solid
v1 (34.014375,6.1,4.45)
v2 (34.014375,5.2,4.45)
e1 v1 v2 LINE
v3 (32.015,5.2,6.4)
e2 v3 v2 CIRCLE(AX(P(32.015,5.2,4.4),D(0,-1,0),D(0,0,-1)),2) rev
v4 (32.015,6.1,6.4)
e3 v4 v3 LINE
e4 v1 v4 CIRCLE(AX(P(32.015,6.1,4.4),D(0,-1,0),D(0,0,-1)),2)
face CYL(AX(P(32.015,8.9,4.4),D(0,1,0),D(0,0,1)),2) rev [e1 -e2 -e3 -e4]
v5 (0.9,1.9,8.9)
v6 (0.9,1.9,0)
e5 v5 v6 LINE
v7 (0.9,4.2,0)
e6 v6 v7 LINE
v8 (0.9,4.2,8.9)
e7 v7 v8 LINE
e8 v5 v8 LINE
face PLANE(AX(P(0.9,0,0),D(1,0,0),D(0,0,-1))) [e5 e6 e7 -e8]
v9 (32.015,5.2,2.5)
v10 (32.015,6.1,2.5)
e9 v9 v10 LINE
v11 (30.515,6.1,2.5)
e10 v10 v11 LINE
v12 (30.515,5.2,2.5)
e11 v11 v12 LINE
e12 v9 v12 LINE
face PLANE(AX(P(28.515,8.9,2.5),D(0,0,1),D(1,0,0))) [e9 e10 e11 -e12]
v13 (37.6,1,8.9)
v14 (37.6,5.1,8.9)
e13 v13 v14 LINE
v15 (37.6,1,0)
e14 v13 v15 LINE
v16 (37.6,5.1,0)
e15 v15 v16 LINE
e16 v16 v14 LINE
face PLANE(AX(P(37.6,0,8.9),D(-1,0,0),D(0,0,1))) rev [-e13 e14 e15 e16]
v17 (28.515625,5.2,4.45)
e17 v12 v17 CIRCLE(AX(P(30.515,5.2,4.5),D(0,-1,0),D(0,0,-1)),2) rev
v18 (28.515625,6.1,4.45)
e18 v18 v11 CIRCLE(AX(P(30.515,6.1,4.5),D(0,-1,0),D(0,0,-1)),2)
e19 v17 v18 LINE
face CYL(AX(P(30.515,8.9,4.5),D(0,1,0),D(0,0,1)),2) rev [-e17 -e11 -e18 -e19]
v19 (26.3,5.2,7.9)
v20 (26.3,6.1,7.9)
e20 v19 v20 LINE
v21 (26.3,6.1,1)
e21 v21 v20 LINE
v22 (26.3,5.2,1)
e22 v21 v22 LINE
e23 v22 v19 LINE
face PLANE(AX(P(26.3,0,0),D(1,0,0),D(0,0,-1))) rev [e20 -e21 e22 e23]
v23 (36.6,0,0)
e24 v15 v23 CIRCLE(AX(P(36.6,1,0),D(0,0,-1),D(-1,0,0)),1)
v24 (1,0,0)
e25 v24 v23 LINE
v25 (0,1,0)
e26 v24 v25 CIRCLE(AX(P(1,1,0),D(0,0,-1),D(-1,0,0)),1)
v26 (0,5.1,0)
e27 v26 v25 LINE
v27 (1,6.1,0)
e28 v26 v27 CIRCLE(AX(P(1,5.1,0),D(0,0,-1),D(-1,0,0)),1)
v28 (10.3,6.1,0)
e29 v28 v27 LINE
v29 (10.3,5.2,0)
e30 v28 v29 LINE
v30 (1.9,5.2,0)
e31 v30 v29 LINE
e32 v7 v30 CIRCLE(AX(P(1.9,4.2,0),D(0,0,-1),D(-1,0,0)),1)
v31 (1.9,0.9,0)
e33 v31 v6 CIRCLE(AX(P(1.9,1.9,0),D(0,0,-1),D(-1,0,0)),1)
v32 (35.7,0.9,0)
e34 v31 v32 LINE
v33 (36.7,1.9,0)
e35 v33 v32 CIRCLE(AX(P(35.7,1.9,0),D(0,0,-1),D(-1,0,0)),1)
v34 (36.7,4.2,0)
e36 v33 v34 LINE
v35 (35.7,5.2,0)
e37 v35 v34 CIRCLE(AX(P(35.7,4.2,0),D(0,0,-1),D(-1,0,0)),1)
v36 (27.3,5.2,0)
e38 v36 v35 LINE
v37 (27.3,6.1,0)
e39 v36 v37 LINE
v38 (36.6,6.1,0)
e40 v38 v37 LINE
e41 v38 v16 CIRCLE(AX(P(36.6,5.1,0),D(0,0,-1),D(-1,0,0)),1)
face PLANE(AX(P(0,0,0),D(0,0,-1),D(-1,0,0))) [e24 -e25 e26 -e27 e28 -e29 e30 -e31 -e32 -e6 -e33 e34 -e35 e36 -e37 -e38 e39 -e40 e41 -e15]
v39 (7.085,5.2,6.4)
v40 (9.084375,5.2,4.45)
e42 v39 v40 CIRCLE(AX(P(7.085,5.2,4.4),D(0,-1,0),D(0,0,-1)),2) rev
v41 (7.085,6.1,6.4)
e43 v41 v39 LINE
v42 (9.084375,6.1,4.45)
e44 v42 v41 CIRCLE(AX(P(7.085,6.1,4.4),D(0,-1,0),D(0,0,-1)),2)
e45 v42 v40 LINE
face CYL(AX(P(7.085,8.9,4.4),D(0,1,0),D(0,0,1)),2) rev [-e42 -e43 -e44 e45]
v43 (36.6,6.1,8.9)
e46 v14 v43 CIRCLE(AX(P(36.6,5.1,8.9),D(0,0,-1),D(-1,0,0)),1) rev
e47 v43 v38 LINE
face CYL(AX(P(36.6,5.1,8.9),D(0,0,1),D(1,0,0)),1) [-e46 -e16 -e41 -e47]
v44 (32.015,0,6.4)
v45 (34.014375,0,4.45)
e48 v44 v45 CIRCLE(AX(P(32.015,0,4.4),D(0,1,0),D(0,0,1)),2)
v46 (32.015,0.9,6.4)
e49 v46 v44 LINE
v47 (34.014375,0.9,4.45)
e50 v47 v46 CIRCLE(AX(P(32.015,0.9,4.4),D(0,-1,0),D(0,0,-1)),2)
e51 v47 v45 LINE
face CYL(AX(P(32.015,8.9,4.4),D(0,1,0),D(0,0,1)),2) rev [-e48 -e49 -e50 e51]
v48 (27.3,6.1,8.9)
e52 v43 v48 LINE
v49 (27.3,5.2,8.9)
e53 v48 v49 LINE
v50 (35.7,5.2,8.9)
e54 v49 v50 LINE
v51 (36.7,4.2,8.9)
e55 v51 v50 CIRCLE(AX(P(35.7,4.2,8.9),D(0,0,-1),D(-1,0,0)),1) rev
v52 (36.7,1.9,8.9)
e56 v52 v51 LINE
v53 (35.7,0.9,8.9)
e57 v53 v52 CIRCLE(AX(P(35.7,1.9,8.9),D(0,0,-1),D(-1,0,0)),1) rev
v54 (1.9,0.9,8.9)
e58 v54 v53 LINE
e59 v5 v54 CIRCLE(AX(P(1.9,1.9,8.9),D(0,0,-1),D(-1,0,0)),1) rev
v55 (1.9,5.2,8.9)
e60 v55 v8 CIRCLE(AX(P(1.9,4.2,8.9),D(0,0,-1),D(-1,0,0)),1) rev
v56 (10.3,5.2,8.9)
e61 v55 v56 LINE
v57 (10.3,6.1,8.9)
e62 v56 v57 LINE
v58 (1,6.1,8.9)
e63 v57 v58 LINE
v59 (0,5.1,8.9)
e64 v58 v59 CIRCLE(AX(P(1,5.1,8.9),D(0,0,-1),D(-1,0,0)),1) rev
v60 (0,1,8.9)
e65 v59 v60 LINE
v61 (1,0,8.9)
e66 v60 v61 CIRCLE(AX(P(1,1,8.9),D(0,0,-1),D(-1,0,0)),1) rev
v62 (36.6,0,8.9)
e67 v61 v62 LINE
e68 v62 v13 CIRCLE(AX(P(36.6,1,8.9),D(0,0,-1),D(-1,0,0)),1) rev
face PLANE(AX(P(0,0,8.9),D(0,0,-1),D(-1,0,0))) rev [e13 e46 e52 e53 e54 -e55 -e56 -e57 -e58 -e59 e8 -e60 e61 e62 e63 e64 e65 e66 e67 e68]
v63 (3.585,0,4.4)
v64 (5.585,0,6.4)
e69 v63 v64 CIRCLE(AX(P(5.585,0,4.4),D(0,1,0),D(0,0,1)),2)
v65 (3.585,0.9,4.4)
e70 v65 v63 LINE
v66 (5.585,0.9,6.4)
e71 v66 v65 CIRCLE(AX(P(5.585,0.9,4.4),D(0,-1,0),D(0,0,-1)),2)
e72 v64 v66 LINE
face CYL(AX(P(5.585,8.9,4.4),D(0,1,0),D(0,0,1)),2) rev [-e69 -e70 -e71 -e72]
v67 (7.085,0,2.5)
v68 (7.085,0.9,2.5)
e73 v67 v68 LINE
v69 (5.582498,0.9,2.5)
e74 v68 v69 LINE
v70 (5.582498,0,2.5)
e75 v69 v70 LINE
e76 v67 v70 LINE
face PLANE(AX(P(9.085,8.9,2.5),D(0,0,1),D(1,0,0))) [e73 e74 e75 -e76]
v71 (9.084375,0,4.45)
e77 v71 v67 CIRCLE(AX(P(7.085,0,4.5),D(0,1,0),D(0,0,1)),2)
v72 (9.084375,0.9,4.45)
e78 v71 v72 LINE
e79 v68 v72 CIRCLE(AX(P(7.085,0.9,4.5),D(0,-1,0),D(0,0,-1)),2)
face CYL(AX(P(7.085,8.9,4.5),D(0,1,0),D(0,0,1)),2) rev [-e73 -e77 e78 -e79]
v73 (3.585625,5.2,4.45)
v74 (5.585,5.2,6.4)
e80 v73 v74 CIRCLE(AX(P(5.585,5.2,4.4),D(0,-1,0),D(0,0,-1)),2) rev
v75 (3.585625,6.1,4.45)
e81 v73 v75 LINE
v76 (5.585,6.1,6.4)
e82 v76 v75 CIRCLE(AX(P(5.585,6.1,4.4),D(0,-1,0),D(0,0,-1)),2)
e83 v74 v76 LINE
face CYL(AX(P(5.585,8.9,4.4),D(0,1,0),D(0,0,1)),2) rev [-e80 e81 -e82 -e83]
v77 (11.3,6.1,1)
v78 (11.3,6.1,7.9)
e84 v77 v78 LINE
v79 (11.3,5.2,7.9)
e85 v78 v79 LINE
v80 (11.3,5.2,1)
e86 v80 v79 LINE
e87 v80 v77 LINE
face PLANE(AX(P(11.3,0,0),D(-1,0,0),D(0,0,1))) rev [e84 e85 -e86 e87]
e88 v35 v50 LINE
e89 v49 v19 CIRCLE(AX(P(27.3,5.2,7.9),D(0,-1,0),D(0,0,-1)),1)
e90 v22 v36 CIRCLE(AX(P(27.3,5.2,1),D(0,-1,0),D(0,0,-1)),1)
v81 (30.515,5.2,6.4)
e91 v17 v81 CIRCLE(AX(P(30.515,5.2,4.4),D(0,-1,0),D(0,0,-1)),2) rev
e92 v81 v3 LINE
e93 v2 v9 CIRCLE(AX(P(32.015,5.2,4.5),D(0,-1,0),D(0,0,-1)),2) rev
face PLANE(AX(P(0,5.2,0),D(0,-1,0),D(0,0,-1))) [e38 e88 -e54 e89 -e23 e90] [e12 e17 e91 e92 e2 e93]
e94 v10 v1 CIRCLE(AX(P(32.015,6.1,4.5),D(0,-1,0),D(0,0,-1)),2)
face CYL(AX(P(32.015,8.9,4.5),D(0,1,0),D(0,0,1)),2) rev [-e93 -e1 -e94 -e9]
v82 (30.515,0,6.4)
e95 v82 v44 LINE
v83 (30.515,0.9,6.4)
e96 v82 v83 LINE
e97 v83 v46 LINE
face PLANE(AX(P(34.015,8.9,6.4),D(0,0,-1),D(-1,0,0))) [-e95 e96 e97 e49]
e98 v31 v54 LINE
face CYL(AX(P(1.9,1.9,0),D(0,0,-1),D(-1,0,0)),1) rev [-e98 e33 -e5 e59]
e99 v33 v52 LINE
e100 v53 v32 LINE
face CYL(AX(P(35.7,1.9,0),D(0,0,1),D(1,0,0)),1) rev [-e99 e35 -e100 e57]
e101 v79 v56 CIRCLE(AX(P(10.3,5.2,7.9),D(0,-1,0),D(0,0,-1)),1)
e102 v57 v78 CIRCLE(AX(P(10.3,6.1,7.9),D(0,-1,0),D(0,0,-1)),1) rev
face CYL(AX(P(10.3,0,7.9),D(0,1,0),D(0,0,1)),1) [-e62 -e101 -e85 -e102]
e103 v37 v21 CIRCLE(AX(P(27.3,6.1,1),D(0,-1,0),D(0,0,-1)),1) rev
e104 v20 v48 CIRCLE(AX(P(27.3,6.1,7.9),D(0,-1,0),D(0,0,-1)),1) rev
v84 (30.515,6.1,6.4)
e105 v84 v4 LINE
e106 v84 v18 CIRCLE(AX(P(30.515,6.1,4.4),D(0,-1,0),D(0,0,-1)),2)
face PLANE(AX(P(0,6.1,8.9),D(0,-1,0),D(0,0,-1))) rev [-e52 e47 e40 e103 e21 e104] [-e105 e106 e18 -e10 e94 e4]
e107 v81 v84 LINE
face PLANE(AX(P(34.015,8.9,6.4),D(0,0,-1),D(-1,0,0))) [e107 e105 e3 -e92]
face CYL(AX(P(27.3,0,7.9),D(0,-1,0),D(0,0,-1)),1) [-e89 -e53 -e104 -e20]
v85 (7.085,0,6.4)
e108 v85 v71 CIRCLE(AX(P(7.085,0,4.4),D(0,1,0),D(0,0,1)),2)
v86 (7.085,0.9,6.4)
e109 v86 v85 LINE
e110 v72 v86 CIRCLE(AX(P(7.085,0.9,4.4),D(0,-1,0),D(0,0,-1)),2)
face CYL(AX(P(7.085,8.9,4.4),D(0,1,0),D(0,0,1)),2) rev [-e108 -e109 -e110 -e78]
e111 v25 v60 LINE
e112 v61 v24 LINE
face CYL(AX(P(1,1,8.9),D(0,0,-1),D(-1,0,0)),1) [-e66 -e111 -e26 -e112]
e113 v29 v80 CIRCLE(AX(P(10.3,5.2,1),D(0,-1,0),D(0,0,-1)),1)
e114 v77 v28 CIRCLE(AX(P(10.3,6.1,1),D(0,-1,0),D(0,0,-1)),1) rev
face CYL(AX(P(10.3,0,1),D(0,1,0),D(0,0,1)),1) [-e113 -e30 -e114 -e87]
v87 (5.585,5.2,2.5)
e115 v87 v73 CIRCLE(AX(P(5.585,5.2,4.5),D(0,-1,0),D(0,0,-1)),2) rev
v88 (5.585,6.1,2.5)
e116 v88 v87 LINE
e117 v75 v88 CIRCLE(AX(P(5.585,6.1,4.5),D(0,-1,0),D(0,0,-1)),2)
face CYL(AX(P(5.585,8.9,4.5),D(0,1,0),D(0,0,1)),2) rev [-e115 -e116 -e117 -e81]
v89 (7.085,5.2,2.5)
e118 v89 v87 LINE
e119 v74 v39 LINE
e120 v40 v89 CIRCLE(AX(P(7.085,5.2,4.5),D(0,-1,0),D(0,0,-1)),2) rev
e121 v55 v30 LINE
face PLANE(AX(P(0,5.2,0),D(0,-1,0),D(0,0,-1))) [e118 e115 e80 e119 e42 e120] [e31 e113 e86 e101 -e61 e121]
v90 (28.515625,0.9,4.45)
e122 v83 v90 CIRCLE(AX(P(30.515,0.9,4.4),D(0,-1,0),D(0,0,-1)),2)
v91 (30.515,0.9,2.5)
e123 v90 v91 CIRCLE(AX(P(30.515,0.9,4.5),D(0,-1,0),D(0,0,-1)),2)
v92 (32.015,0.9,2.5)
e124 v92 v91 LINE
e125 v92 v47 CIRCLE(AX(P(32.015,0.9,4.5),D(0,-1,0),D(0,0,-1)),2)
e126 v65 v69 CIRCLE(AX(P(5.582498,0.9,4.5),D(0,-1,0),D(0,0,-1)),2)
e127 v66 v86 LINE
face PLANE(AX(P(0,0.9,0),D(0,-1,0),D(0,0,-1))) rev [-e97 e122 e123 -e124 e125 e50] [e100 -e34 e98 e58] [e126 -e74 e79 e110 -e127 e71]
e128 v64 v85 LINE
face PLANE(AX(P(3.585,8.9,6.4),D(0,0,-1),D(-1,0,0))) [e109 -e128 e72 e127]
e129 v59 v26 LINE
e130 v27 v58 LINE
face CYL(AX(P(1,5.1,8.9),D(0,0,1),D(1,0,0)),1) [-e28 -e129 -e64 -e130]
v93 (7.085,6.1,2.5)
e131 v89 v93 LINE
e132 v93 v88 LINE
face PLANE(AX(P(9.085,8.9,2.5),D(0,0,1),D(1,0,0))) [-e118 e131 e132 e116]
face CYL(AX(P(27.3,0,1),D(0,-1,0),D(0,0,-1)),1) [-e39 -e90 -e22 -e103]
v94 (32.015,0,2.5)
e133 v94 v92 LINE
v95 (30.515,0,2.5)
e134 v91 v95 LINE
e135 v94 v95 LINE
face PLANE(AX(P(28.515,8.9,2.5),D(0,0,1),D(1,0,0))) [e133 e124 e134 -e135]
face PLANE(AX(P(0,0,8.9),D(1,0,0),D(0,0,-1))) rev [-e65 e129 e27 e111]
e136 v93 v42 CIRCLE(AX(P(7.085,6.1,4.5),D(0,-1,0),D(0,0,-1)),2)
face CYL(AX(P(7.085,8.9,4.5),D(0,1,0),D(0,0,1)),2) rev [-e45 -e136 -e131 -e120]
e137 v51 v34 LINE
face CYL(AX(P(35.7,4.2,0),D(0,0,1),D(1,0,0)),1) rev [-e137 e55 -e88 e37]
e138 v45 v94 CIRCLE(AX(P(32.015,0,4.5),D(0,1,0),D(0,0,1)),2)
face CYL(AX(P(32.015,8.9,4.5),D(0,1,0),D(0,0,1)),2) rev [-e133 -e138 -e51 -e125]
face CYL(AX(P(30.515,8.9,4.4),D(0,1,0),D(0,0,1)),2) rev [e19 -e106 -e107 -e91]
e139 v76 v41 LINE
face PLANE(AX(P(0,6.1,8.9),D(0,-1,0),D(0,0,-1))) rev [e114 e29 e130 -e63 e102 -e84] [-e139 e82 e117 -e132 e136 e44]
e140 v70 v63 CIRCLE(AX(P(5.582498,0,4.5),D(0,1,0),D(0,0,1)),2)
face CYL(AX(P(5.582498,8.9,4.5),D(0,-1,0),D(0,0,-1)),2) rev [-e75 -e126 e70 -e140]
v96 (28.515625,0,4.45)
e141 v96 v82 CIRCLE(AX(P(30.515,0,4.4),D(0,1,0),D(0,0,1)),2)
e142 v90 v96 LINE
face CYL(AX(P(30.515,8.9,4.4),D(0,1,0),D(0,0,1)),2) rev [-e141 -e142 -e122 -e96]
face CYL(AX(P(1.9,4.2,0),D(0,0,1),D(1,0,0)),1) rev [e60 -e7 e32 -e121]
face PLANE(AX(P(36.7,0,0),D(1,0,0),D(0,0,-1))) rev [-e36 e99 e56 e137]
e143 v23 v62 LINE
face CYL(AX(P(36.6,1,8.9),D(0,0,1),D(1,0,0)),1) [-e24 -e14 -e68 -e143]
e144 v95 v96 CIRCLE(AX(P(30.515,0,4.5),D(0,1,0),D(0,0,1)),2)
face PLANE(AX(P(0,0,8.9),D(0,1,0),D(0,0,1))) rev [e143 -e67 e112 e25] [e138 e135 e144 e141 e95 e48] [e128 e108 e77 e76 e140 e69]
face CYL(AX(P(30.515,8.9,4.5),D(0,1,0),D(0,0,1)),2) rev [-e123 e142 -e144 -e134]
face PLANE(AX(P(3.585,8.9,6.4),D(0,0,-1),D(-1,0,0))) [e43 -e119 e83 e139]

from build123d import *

# Parameters (mm, degrees)
CROQUIS1_W              = 37.6
CROQUIS1_H              = 6.1
SALIENTE_EXTRUIR1_DEPTH = 8.9
CROQUIS2_W              = 35.8
CROQUIS2_H              = 4.3
CROQUIS2_W_2            = 15
CROQUIS2_H_2            = 0.9
CORTAR_EXTRUIR2_DEPTH   = 8.9
CROQUIS3_W              = 5.5
CROQUIS3_H              = 3.9
CORTAR_EXTRUIR3_DEPTH   = 8.9
REDONDEO1_R             = 2
REDONDEO2_START         = 5.2
REDONDEO2_DEPTH         = 0.9
REDONDEO2_2_DEPTH       = 0.9
REDONDEO4_R             = 1
REDONDEO5_R             = 1
REDONDEO6_R             = 1
REDONDEO7_R             = 1
REDONDEO8_R             = 1
REDONDEO9_R             = 1
REDONDEO10_R            = 1
REDONDEO11_R            = 1
REDONDEO12_R            = 1
REDONDEO13_R            = 1
REDONDEO14_R            = 1
REDONDEO15_R            = 1


with BuildPart() as part:
    # Croquis1 → Saliente-Extruir1 (new body)
    with BuildSketch(Plane.XY):
        with Locations((18.8, 3.05)):
            Rectangle(CROQUIS1_W, CROQUIS1_H)
    extrude(amount=SALIENTE_EXTRUIR1_DEPTH)

    # Croquis2 → Cortar-Extruir2 (cut)
    with BuildSketch(Plane.XY.offset(8.9)):
        with Locations((18.8, 3.05)):
            Rectangle(CROQUIS2_W, CROQUIS2_H)
        with Locations((18.8, 5.65)):
            Rectangle(CROQUIS2_W_2, CROQUIS2_H_2)
    extrude(amount=-CORTAR_EXTRUIR2_DEPTH, mode=Mode.SUBTRACT)

    # Croquis3 → Cortar-Extruir3 (cut)
    with BuildSketch(Plane(origin=(0, 0, 0), x_dir=(1, 0, 0), z_dir=(0, 1, 0))):
        with Locations((6.335, -4.45)):
            Rectangle(CROQUIS3_W, CROQUIS3_H)
        with Locations((31.265, -4.45)):
            Rectangle(CROQUIS3_W, CROQUIS3_H)
    extrude(amount=CORTAR_EXTRUIR3_DEPTH, mode=Mode.SUBTRACT)

    # Redondeo1
    redondeo1_edges = [part.edges().sort_by_distance(p)[0] for p in [
        (3.585, 0.45, 6.4),
    ]]
    fillet(redondeo1_edges, radius=REDONDEO1_R)


with BuildPart() as redondeo2_tool:
    # Redondeo2: read off the stored shape, not the designer's step
    # Redondeo2 outline → Redondeo2 (new body)
    with BuildSketch(Plane(origin=(0, 0, 0), x_dir=(1, 0, 0), z_dir=(0, 1, 0)).offset(REDONDEO2_START)):
        with BuildLine():
            ThreePointArc((5.585, -6.4), (4.188575996, -5.831782106), (3.585625098, -4.45))
            ThreePointArc((3.585625098, -4.45), (4.187680846, -3.069091484), (5.582498438, -2.500001564))
            Line((5.582498438, -2.500001564), (3.585, -2.5))
            Line((3.585, -2.5), (3.585, -6.4))
            Line((3.585, -6.4), (5.585, -6.4))
        make_face()
        with BuildLine():
            ThreePointArc((9.084374902, -4.45), (8.481424004, -5.831782106), (7.085, -6.4))
            Line((7.085, -6.4), (9.085, -6.4))
            Line((9.085, -6.4), (9.085, -2.5))
            Line((9.085, -2.5), (7.085, -2.5))
            ThreePointArc((7.085, -2.5), (8.481424004, -3.068217894), (9.084374902, -4.45))
        make_face()
        with BuildLine():
            ThreePointArc((28.515625098, -4.45), (29.118575996, -3.068217894), (30.515, -2.5))
            Line((30.515, -2.5), (28.515, -2.5))
            Line((28.515, -2.5), (28.515, -6.4))
            Line((28.515, -6.4), (30.515, -6.4))
            ThreePointArc((30.515, -6.4), (29.118575996, -5.831782106), (28.515625098, -4.45))
        make_face()
        with BuildLine():
            Line((34.015, -2.5), (32.015, -2.5))
            ThreePointArc((32.015, -2.5), (33.411424004, -3.068217894), (34.014374902, -4.45))
            ThreePointArc((34.014374902, -4.45), (33.411424004, -5.831782106), (32.015, -6.4))
            Line((32.015, -6.4), (34.015, -6.4))
            Line((34.015, -6.4), (34.015, -2.5))
        make_face()
    extrude(amount=REDONDEO2_DEPTH)


with BuildPart() as part_1:
    add(part.part)


with BuildPart() as part_2:
    # Redondeo2: joined with redondeo2_tool
    add(part_1.part.fuse(redondeo2_tool.part, tol=0.00001))


with BuildPart() as redondeo2_2_tool:
    # Redondeo2 2 outline → Redondeo2 2 (new body)
    with BuildSketch(Plane(origin=(0, 0, 0), x_dir=(1, 0, 0), z_dir=(0, 1, 0))):
        with BuildLine():
            ThreePointArc((3.585, -4.4), (4.20409356, -3.050862325), (5.582498436, -2.5))
            Line((5.582498436, -2.5), (3.585, -2.5))
            Line((3.585, -2.5), (3.585, -4.4))
        make_face()
        with BuildLine():
            ThreePointArc((9.084374902, -4.45), (8.481424004, -5.831782106), (7.085, -6.4))
            Line((7.085, -6.4), (9.085, -6.4))
            Line((9.085, -6.4), (9.085, -2.5))
            Line((9.085, -2.5), (7.085, -2.5))
            ThreePointArc((7.085, -2.5), (8.481424004, -3.068217894), (9.084374902, -4.45))
        make_face()
        with BuildLine():
            ThreePointArc((28.515625098, -4.45), (29.118575996, -3.068217894), (30.515, -2.5))
            Line((30.515, -2.5), (28.515, -2.5))
            Line((28.515, -2.5), (28.515, -6.4))
            Line((28.515, -6.4), (30.515, -6.4))
            ThreePointArc((30.515, -6.4), (29.118575996, -5.831782106), (28.515625098, -4.45))
        make_face()
        with BuildLine():
            Line((34.015, -2.5), (32.015, -2.5))
            ThreePointArc((32.015, -2.5), (33.411424004, -3.068217894), (34.014374902, -4.45))
            ThreePointArc((34.014374902, -4.45), (33.411424004, -5.831782106), (32.015, -6.4))
            Line((32.015, -6.4), (34.015, -6.4))
            Line((34.015, -6.4), (34.015, -2.5))
        make_face()
    extrude(amount=REDONDEO2_2_DEPTH)


with BuildPart() as part_3:
    add(part_2.part)


with BuildPart() as part_4:
    # Redondeo2 2: joined with redondeo2_2_tool
    add(part_3.part.fuse(redondeo2_2_tool.part, tol=0.00001))

    # Redondeo4
    redondeo4_edges = [part_4.edges().sort_by_distance(p)[0] for p in [
        (0, 0, 4.45),
    ]]
    fillet(redondeo4_edges, radius=REDONDEO4_R)

    # Redondeo5
    redondeo5_edges = [part_4.edges().sort_by_distance(p)[0] for p in [
        (37.6, 0, 4.45),
    ]]
    fillet(redondeo5_edges, radius=REDONDEO5_R)

    # Redondeo6
    redondeo6_edges = [part_4.edges().sort_by_distance(p)[0] for p in [
        (37.6, 6.1, 4.45),
    ]]
    fillet(redondeo6_edges, radius=REDONDEO6_R)

    # Redondeo7
    redondeo7_edges = [part_4.edges().sort_by_distance(p)[0] for p in [
        (0, 6.1, 4.45),
    ]]
    fillet(redondeo7_edges, radius=REDONDEO7_R)

    # Redondeo8
    redondeo8_edges = [part_4.edges().sort_by_distance(p)[0] for p in [
        (0.9, 0.9, 4.45),
    ]]
    fillet(redondeo8_edges, radius=REDONDEO8_R)

    # Redondeo9
    redondeo9_edges = [part_4.edges().sort_by_distance(p)[0] for p in [
        (0.9, 5.2, 4.45),
    ]]
    fillet(redondeo9_edges, radius=REDONDEO9_R)

    # Redondeo10
    redondeo10_edges = [part_4.edges().sort_by_distance(p)[0] for p in [
        (36.7, 0.9, 4.45),
    ]]
    fillet(redondeo10_edges, radius=REDONDEO10_R)

    # Redondeo11
    redondeo11_edges = [part_4.edges().sort_by_distance(p)[0] for p in [
        (36.7, 5.2, 4.45),
    ]]
    fillet(redondeo11_edges, radius=REDONDEO11_R)

    # Redondeo12
    redondeo12_edges = [part_4.edges().sort_by_distance(p)[0] for p in [
        (26.3, 5.65, 8.9),
    ]]
    fillet(redondeo12_edges, radius=REDONDEO12_R)

    # Redondeo13
    redondeo13_edges = [part_4.edges().sort_by_distance(p)[0] for p in [
        (26.3, 5.65, 0),
    ]]
    fillet(redondeo13_edges, radius=REDONDEO13_R)

    # Redondeo14
    redondeo14_edges = [part_4.edges().sort_by_distance(p)[0] for p in [
        (11.3, 5.65, 0),
    ]]
    fillet(redondeo14_edges, radius=REDONDEO14_R)

    # Redondeo15
    redondeo15_edges = [part_4.edges().sort_by_distance(p)[0] for p in [
        (11.3, 5.65, 8.9),
    ]]
    fillet(redondeo15_edges, radius=REDONDEO15_R)


solid = part_4.part
